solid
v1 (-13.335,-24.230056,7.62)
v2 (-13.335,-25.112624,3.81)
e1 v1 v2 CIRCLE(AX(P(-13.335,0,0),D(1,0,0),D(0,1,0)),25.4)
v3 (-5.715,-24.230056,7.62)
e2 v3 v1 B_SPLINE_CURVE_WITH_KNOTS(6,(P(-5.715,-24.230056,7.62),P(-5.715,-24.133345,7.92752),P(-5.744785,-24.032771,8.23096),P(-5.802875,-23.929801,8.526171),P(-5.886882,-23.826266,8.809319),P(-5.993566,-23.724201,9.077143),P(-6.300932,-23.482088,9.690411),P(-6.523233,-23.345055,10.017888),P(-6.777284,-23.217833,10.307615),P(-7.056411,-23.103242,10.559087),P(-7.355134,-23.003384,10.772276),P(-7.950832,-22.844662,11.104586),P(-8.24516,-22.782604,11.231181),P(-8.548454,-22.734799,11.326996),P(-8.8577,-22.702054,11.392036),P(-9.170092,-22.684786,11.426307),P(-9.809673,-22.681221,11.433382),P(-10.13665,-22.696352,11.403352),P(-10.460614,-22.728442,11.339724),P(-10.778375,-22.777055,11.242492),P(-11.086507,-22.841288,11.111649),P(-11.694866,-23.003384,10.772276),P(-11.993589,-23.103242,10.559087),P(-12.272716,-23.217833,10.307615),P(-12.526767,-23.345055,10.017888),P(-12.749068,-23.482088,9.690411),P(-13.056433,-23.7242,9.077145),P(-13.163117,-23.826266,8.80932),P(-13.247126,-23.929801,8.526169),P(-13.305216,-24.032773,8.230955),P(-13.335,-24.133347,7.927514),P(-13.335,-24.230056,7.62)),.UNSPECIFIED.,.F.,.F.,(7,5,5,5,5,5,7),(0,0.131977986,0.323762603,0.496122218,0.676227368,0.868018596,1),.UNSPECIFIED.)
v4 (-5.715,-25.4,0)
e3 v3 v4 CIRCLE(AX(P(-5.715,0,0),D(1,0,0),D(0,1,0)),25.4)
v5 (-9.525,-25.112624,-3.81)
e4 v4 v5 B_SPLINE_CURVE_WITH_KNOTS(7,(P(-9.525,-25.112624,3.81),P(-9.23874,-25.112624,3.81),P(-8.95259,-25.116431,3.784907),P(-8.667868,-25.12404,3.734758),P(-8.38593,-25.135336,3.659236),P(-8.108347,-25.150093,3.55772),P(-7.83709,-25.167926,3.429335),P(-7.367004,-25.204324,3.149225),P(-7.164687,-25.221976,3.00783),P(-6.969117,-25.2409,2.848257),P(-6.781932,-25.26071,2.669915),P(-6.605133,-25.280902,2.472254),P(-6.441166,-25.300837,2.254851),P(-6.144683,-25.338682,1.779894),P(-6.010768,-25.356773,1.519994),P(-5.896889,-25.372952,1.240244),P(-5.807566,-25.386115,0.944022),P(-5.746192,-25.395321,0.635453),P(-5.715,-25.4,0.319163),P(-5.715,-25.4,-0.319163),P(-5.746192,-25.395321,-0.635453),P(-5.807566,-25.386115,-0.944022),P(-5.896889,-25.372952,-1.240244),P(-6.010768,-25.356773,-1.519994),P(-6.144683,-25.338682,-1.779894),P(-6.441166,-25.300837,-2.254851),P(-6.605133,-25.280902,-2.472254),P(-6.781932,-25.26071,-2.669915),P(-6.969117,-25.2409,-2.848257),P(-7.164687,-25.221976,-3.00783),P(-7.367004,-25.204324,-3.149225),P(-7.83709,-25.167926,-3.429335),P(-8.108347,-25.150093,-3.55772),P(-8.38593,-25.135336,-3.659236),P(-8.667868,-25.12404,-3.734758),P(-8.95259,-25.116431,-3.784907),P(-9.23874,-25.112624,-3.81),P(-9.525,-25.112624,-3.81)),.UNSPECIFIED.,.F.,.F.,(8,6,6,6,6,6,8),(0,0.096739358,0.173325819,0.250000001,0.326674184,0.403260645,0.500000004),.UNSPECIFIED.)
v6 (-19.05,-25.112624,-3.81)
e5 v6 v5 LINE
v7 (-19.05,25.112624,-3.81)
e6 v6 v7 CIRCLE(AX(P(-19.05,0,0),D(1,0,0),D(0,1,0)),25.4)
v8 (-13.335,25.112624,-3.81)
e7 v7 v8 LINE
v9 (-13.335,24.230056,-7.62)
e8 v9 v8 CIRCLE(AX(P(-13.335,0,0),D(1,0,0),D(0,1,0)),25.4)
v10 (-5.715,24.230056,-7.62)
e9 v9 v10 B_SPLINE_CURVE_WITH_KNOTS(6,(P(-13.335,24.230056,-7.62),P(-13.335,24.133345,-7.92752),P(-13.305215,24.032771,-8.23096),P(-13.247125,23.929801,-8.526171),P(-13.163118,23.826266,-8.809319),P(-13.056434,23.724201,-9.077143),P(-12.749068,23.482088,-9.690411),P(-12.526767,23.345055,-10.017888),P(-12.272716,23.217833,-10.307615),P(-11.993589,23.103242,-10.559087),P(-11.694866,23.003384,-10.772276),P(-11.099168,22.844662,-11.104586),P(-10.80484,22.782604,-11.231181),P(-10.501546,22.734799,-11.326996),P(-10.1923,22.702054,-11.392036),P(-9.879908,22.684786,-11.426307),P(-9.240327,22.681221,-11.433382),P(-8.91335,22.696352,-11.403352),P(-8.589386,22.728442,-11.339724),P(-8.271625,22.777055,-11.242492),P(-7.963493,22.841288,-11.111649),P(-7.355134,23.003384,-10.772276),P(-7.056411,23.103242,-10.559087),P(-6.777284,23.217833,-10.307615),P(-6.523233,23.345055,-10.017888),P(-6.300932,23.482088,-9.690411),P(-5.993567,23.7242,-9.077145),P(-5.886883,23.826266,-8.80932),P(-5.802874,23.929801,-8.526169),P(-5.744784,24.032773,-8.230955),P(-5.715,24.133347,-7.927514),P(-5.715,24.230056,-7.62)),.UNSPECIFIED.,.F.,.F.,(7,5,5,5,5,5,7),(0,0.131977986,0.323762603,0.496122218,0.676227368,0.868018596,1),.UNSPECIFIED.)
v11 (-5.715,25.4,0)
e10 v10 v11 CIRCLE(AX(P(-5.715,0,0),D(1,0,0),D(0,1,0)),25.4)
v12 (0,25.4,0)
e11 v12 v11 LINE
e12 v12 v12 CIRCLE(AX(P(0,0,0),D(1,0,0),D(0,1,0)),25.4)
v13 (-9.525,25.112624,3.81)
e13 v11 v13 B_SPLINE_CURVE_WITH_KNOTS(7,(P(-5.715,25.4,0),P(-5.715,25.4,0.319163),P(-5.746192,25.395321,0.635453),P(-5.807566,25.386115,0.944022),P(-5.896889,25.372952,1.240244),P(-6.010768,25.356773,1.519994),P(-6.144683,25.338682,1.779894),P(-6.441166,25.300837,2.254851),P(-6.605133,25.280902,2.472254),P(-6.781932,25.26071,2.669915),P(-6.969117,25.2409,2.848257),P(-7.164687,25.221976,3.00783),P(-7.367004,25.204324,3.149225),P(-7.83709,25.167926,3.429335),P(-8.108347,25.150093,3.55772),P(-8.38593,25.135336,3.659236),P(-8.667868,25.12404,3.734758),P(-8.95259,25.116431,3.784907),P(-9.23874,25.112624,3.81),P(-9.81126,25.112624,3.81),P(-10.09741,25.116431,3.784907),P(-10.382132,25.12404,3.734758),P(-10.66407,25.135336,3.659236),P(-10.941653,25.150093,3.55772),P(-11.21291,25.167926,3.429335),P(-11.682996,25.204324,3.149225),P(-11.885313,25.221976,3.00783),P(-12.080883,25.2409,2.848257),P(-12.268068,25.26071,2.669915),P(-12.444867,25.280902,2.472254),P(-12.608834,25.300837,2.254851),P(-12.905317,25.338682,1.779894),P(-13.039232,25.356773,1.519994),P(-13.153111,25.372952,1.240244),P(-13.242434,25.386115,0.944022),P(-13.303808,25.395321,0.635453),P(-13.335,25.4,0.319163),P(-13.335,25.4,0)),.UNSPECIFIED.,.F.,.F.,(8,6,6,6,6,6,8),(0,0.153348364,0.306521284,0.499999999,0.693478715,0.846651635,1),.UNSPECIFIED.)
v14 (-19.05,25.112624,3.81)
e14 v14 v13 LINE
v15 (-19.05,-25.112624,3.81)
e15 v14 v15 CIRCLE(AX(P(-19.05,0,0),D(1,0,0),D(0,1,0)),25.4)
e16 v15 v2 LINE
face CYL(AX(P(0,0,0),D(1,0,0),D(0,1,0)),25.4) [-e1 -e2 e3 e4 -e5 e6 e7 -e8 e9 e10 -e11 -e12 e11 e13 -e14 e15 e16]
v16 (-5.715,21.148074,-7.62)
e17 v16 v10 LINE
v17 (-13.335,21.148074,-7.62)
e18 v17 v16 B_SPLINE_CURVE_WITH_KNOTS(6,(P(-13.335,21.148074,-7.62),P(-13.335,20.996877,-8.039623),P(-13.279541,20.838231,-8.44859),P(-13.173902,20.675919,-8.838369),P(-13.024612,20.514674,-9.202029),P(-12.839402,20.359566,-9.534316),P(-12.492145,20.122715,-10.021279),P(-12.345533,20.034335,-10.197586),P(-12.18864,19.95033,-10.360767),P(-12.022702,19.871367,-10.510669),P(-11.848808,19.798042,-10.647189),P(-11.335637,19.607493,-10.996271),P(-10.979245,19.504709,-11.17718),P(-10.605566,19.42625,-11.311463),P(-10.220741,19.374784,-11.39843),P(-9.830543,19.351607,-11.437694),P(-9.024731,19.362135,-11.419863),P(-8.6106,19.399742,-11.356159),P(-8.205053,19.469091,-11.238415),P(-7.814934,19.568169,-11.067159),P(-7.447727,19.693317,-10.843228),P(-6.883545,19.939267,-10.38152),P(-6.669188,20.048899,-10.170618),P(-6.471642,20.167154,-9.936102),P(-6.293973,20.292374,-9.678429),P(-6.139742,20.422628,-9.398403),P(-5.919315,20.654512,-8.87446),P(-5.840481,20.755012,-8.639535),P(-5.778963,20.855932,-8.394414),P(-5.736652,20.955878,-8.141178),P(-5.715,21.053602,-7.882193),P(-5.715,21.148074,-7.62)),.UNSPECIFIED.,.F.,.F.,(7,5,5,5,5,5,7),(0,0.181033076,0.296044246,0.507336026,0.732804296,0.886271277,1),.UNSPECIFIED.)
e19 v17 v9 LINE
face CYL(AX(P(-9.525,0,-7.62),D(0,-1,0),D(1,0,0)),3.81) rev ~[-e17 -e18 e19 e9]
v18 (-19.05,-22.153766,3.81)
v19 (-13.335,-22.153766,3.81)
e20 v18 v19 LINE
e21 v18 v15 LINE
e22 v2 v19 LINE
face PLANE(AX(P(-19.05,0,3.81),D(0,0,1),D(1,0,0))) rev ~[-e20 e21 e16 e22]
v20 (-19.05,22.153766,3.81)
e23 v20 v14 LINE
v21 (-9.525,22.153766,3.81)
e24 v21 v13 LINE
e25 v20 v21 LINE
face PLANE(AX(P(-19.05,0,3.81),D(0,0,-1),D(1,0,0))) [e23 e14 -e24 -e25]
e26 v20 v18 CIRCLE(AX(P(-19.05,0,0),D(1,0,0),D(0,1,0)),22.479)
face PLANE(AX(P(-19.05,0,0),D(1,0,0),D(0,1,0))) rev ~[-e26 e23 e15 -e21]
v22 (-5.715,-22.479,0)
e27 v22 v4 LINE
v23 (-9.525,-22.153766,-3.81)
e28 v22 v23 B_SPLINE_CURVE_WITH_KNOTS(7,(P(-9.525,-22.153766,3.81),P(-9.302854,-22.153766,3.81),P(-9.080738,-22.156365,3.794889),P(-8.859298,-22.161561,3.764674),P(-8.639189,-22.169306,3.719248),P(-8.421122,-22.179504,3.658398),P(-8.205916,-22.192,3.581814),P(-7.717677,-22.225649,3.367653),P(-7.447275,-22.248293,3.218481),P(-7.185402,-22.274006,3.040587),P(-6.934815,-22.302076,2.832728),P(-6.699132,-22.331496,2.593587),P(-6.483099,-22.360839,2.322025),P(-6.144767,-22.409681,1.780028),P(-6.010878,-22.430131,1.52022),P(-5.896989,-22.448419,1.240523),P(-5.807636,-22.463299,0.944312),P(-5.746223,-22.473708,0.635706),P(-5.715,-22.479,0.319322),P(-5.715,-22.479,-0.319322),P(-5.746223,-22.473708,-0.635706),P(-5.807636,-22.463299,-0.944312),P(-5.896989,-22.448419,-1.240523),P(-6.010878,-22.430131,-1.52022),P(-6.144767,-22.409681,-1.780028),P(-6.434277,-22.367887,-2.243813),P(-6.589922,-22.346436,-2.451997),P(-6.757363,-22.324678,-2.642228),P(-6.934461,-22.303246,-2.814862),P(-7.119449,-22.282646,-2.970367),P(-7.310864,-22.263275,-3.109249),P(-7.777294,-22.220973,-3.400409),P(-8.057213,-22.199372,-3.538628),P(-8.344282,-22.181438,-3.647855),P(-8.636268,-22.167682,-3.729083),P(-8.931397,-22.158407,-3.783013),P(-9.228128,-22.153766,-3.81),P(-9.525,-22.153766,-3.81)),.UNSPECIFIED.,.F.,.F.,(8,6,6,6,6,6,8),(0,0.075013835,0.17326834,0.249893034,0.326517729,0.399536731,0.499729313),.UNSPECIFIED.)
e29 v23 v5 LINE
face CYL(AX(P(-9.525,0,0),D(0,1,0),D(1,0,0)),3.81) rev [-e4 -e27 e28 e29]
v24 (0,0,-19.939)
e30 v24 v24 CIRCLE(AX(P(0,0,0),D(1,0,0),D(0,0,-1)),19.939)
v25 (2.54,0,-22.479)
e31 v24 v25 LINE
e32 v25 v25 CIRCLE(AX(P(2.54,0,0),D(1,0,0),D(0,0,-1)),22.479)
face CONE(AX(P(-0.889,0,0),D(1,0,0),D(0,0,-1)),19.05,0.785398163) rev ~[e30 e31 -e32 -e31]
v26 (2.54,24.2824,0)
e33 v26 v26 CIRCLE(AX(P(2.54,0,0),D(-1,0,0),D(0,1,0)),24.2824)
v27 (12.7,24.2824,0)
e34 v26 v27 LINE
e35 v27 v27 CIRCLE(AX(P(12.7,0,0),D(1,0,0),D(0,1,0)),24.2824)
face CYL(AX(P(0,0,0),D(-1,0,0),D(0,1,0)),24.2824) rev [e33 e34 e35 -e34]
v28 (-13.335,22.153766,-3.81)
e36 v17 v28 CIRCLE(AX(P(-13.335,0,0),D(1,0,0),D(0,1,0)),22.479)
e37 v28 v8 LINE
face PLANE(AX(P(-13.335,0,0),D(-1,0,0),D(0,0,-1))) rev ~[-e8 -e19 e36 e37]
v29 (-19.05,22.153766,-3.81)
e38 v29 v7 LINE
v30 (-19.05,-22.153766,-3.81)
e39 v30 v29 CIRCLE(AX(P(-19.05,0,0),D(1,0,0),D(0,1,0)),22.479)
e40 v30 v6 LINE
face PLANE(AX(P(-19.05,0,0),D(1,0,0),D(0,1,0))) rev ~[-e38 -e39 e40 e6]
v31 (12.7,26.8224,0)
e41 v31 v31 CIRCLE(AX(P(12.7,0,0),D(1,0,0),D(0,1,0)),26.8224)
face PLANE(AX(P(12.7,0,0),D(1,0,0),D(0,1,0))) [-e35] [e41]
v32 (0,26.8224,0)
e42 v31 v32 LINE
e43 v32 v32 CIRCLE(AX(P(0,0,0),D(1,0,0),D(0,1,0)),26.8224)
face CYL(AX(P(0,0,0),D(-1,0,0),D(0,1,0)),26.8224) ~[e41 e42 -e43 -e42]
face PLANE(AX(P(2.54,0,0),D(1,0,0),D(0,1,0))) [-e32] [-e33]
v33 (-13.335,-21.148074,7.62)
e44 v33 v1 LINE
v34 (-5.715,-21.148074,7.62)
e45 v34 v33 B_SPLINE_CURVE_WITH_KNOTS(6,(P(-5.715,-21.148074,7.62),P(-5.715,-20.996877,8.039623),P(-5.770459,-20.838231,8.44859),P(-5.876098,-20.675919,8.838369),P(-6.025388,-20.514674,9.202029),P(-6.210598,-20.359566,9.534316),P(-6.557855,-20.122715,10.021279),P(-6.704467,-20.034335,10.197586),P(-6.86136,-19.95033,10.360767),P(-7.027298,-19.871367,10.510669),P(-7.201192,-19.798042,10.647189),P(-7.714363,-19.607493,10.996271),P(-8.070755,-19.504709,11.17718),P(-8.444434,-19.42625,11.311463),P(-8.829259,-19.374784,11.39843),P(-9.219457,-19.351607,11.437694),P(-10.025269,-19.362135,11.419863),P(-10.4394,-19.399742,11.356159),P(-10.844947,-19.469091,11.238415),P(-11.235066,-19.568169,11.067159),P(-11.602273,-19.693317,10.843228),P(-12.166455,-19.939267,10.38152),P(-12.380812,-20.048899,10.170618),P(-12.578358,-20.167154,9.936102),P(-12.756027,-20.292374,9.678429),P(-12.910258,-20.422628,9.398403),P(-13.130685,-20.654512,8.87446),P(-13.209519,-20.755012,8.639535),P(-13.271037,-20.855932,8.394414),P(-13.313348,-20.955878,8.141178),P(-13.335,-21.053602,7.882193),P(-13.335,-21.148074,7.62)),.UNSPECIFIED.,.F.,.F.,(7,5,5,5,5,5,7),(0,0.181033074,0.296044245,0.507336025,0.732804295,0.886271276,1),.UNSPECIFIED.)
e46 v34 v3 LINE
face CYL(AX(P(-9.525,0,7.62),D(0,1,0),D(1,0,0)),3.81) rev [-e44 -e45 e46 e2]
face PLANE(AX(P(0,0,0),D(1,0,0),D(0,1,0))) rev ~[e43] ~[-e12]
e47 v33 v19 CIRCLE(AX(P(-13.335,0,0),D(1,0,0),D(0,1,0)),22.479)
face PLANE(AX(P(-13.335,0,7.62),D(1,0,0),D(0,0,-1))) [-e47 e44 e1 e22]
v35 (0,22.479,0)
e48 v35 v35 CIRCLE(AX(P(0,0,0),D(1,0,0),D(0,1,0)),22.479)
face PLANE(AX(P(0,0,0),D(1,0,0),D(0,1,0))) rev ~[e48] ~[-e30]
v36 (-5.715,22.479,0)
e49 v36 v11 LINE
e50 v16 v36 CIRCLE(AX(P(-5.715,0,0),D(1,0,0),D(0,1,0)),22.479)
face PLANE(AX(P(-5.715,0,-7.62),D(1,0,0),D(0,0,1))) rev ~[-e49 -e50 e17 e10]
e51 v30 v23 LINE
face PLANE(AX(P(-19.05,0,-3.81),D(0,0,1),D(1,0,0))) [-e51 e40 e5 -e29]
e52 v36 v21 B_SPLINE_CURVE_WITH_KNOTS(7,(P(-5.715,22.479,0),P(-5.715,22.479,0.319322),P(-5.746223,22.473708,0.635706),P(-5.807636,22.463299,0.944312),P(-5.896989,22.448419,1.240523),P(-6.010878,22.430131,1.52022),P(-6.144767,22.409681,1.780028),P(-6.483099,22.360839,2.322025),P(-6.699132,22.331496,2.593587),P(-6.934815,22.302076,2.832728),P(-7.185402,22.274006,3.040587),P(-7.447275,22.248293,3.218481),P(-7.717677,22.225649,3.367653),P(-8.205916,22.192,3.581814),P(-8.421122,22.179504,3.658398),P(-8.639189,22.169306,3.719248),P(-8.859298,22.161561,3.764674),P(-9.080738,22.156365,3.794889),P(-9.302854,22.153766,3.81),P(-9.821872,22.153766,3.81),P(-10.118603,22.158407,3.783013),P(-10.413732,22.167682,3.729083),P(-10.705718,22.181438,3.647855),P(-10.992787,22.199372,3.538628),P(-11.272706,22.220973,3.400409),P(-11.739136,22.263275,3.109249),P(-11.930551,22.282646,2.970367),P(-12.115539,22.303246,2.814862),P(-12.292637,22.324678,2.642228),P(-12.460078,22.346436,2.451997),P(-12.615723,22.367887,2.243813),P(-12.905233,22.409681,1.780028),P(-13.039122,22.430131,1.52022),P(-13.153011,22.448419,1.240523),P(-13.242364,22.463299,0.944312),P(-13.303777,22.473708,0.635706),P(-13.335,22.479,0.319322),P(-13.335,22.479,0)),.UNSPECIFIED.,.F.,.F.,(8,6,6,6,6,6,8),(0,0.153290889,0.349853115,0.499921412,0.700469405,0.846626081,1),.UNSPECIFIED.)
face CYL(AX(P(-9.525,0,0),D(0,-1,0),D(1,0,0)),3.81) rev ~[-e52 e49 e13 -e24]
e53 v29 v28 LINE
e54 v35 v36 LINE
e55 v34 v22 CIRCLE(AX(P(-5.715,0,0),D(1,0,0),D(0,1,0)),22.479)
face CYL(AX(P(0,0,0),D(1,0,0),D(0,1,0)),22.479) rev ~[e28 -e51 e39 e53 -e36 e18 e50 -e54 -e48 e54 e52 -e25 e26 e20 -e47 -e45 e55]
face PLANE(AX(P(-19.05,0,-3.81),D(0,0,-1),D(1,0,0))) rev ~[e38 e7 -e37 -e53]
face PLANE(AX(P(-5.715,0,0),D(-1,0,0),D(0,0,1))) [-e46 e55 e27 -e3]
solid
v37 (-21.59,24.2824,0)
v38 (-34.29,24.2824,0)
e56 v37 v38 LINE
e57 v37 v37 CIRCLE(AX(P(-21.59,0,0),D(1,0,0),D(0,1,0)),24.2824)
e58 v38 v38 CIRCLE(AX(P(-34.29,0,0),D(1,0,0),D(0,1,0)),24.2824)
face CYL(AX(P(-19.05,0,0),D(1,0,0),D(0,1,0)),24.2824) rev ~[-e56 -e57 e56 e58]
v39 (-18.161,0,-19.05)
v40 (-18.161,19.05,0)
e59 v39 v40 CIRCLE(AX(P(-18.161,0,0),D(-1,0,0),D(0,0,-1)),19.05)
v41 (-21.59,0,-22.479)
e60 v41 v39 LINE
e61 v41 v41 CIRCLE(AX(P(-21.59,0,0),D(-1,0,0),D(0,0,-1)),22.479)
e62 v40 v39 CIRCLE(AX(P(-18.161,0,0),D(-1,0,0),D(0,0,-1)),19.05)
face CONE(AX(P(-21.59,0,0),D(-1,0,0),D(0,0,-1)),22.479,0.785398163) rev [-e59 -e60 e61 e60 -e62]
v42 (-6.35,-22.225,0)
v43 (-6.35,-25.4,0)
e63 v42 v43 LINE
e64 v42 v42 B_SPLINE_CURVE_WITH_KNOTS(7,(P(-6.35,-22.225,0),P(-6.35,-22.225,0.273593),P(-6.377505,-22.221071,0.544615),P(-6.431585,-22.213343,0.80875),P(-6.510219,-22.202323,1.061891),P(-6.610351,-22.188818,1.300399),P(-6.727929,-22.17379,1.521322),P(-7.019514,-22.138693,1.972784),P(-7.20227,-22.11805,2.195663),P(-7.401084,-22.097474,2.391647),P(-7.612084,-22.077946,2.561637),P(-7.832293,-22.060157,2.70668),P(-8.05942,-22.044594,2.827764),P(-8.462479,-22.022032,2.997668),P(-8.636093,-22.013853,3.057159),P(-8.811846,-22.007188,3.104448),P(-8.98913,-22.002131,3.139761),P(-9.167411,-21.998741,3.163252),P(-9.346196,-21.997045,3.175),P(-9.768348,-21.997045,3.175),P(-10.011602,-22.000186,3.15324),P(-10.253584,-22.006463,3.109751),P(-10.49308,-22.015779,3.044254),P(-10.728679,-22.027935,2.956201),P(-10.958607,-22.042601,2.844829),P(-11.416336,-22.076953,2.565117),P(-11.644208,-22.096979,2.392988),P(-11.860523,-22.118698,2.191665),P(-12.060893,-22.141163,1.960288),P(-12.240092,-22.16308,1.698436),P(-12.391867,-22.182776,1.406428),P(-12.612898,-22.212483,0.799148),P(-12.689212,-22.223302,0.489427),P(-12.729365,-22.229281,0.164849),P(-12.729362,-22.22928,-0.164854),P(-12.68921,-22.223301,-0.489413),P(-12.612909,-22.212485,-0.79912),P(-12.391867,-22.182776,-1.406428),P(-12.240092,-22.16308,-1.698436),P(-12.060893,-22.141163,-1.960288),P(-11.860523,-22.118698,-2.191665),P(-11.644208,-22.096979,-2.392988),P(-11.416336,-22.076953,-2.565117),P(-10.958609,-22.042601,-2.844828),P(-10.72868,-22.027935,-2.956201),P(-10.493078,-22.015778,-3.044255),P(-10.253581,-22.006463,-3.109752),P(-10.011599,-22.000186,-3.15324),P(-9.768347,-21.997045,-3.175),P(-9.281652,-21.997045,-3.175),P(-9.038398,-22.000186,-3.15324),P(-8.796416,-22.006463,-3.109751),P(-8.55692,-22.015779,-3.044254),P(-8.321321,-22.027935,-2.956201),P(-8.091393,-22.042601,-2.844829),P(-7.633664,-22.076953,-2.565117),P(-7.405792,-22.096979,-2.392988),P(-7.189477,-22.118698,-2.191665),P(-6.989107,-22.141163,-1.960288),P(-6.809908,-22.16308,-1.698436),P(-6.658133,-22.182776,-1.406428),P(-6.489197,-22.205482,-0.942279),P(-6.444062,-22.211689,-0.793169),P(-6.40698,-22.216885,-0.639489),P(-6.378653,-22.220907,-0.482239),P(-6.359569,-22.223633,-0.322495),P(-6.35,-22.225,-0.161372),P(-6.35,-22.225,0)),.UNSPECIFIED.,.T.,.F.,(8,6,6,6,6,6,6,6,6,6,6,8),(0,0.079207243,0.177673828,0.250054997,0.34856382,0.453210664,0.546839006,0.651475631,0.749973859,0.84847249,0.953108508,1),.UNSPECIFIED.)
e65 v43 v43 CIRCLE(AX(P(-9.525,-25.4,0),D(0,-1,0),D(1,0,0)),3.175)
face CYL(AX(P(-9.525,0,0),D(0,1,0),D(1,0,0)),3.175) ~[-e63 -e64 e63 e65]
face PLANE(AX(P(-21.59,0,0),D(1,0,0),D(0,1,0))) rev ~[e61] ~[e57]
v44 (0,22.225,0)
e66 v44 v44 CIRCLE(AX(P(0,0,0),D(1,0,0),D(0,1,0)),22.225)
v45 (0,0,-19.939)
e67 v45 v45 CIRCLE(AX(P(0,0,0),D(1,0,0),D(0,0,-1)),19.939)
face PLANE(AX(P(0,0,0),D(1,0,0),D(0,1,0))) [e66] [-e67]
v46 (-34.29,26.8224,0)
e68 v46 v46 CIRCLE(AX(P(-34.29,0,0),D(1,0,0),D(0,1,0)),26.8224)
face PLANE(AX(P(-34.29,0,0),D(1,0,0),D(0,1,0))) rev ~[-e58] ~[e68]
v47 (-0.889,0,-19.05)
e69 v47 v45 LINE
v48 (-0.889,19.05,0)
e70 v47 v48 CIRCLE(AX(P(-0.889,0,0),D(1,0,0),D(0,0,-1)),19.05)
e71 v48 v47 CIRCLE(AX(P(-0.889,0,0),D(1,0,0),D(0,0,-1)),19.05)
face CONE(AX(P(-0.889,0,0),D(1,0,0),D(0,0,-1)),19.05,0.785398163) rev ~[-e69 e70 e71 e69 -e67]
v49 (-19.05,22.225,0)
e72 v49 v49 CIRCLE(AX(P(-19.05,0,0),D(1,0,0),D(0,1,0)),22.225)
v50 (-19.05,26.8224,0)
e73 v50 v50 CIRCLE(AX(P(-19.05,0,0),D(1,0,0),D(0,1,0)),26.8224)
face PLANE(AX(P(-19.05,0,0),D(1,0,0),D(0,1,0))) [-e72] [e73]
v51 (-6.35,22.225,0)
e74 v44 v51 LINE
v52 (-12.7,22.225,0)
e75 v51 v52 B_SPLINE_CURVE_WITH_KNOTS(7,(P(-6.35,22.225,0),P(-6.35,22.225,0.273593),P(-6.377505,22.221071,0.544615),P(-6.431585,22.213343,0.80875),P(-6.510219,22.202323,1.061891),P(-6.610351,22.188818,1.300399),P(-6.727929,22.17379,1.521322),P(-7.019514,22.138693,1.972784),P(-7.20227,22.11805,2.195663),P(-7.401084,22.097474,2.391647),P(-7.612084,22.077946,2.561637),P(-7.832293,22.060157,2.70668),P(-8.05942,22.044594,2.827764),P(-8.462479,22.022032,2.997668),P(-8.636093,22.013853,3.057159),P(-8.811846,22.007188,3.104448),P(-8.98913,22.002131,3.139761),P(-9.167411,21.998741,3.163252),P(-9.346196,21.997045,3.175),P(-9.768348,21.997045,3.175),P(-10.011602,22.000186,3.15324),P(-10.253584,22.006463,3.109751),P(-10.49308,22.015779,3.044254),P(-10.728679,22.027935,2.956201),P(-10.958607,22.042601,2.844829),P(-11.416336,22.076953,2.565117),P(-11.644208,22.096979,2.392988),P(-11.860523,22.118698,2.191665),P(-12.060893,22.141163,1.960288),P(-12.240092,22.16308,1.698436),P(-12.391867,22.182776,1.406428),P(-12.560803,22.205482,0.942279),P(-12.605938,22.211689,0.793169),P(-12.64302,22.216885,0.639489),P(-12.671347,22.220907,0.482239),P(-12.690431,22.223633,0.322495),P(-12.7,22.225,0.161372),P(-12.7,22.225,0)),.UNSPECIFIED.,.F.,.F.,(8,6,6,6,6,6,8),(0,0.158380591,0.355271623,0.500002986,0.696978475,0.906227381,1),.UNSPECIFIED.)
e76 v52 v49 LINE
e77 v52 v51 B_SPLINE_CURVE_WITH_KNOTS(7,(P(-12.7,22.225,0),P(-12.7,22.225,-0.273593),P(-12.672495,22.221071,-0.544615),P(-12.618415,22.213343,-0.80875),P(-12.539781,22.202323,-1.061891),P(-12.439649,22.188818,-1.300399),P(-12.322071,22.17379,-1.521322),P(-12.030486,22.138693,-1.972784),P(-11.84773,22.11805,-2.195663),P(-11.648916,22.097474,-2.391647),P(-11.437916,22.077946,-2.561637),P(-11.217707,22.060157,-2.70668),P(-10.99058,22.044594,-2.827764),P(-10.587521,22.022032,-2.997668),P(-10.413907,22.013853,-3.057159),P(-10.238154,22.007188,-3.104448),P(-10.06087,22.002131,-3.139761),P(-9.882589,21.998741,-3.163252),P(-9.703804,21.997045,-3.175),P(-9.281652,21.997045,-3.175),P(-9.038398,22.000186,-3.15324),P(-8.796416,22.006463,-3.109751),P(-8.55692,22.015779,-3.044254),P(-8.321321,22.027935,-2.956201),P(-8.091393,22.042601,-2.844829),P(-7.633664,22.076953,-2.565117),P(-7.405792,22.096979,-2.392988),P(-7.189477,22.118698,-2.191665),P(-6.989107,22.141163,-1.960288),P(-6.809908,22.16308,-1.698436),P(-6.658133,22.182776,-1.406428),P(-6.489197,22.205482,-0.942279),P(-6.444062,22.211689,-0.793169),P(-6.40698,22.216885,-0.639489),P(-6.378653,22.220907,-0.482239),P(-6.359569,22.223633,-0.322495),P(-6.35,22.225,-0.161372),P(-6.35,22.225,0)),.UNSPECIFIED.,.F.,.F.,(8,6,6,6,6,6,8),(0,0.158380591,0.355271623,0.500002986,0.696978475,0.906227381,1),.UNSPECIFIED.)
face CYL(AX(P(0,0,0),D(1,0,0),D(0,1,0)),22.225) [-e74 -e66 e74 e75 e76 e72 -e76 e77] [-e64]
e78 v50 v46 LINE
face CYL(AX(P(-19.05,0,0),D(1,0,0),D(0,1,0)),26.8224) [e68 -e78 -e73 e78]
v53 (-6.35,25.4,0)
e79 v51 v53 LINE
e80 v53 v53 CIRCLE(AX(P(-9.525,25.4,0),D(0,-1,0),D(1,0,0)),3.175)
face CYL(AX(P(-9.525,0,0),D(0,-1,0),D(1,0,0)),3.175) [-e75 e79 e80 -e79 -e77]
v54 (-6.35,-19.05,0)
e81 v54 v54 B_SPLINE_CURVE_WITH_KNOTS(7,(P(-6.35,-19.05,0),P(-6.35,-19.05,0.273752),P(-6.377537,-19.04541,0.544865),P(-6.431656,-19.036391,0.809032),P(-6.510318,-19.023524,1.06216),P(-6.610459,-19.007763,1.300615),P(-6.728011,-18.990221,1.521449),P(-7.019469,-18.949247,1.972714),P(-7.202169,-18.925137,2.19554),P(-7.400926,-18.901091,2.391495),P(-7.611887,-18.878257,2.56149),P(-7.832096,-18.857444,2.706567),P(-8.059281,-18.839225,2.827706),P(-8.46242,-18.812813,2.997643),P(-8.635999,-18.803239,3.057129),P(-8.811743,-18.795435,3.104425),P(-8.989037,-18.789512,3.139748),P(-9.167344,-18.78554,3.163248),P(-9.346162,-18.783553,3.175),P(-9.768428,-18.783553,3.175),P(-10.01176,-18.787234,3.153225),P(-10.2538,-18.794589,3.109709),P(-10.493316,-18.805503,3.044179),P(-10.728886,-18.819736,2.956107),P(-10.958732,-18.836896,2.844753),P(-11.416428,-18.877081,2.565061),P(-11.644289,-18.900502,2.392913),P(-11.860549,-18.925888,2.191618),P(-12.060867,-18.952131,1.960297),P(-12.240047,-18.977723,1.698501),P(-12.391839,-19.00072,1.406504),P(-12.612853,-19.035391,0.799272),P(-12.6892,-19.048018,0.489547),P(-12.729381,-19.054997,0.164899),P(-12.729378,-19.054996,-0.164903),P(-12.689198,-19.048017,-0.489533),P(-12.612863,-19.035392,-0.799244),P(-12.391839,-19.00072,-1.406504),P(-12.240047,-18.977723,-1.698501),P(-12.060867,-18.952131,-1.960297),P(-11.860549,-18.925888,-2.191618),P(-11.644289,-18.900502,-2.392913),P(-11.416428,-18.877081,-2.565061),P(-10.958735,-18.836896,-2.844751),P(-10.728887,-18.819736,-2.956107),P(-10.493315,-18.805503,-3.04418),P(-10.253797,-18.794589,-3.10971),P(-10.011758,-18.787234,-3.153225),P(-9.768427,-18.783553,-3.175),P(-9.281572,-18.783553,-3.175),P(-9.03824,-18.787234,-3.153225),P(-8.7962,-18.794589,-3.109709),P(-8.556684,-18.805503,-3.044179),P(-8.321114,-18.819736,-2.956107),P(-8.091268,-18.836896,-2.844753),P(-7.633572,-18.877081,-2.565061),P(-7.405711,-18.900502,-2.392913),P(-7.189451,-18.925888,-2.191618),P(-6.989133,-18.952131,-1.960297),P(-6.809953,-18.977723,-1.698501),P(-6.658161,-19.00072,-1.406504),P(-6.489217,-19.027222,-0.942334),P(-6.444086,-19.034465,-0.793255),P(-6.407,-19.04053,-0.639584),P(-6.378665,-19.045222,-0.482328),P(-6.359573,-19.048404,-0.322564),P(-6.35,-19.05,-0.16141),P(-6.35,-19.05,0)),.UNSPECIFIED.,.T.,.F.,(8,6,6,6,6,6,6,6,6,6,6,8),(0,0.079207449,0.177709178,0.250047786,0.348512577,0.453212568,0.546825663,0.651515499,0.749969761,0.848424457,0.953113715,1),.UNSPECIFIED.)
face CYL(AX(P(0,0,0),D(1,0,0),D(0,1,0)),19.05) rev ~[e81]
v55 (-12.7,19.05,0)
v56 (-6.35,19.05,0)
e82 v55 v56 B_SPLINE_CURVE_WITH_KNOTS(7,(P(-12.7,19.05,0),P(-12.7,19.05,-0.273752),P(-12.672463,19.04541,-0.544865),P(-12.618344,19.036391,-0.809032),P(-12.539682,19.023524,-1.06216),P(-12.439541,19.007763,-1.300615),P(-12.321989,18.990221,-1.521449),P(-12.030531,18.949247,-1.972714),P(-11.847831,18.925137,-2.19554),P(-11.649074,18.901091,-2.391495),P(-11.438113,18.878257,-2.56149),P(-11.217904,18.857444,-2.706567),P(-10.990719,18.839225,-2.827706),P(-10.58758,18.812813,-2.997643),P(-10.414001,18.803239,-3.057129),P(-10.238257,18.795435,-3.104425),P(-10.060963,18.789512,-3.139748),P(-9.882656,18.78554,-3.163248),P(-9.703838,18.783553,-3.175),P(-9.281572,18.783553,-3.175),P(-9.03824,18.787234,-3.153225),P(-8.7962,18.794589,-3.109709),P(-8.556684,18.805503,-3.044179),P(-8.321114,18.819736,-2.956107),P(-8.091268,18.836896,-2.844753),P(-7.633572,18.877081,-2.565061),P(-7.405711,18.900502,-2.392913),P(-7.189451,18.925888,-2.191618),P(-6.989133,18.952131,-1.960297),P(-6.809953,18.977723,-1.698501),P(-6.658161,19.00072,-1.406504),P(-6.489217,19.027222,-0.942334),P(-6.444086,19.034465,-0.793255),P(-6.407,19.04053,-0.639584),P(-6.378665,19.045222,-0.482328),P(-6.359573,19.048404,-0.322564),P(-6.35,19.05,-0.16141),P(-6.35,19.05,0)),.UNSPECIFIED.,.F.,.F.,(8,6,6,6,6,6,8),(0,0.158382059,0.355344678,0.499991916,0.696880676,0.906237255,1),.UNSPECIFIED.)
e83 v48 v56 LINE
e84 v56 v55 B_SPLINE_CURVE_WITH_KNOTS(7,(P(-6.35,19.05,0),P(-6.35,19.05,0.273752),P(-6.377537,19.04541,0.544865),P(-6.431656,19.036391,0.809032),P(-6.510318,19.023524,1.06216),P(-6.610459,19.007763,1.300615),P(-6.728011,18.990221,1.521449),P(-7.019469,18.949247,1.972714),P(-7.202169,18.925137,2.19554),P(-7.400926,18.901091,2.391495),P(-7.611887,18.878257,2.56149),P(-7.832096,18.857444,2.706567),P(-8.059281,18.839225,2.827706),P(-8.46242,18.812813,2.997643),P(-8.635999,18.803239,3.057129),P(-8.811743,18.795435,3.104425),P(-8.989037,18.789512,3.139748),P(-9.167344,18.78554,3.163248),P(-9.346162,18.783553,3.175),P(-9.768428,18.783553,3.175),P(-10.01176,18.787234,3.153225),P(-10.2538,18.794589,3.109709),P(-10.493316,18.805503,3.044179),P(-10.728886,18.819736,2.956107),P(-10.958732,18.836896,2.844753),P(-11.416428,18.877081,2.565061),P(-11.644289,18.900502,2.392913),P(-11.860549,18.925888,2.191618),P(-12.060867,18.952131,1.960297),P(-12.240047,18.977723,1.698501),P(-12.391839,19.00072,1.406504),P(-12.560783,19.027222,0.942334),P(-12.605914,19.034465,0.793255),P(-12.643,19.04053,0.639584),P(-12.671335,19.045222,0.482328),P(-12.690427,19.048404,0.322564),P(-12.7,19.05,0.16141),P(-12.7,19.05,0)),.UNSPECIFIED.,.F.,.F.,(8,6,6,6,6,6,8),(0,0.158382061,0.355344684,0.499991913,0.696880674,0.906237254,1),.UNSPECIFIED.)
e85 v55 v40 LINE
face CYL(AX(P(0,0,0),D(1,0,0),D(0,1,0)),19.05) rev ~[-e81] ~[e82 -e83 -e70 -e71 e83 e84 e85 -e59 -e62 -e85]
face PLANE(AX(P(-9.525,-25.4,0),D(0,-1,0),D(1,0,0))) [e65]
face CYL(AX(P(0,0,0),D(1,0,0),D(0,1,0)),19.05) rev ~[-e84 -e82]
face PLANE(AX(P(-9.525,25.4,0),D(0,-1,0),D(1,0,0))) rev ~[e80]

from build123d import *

# Parameters (mm, degrees)
F0_R           = 26.8224
F0_R_2         = 24.2824
F0_R_3         = 19.05
F1_DEPTH       = 2.54
F2_DEPTH       = 12.7
F3_R           = 25.4
F3_R_2         = 22.479
F4_DEPTH       = 19.05
F5_W           = 9.525
F5_H           = 7.62
F6_DEPTH       = 50.8
F6_DEPTH_BACK  = 50.8
F7_R           = 3.81
F8_DEPTH       = 50.8
F8_DEPTH_BACK  = 50.8
F10_DEPTH      = 50.8
F12_DEPTH      = 25.4
F13_R          = 22.225
F13_R_2        = 19.05
F14_DEPTH      = 21.59
F15_START      = -19.05
F13_R_3        = 24.2824
F15_DEPTH      = 2.54
F17_START      = -19.05
F16_R          = 26.8224
F16_R_2        = 24.2824
F17_DEPTH      = 15.24
F18_R          = 3.175
F19_DEPTH      = 25.4
F19_DEPTH_BACK = 25.4
F20_DEPTH      = 25.4
F21_W          = 2.54
F21_H          = 0.889


with BuildPart() as f1:
    # F0 (on Right) → F1 (new body)
    with BuildSketch(Plane.YZ):
        Circle(F0_R)
        Circle(F0_R_2, mode=Mode.SUBTRACT)
        Circle(F0_R_2)
        Circle(F0_R_3, mode=Mode.SUBTRACT)
    extrude(amount=F1_DEPTH)

    # F0 (on Right) → F2 (join)
    with BuildSketch(Plane.YZ):
        Circle(F0_R)
        Circle(F0_R_2, mode=Mode.SUBTRACT)
    extrude(amount=F2_DEPTH)

    # F3 (on Right) → F4 (join)
    with BuildSketch(Plane.YZ):
        Circle(F3_R)
        Circle(F3_R_2, mode=Mode.SUBTRACT)
    extrude(amount=-F4_DEPTH)

    # F5 (on Front) → F6 (cut, two sides)
    with BuildSketch(Plane.XZ) as f6_sk:
        with Locations((-14.2875, 0)):
            Rectangle(F5_W, F5_H)
    extrude(amount=-F6_DEPTH, mode=Mode.SUBTRACT)
    extrude(f6_sk.sketch, amount=F6_DEPTH_BACK, mode=Mode.SUBTRACT)

    # F7 (on Front) → F8 (cut, two sides)
    with BuildSketch(Plane.XZ) as f8_sk:
        with Locations((-9.525, 0)):
            Circle(F7_R)
    extrude(amount=-F8_DEPTH, mode=Mode.SUBTRACT)
    extrude(f8_sk.sketch, amount=F8_DEPTH_BACK, mode=Mode.SUBTRACT)

    # F9 (on Front) → F10 (cut)
    with BuildSketch(Plane.XZ):
        with BuildLine():
            ThreePointArc((-13.335, 7.62), (-9.525, 3.81), (-5.715, 7.62))
            ThreePointArc((-5.715, 7.62), (-9.525, 11.43), (-13.335, 7.62))
        make_face()
        with BuildLine():
            Line((-5.715, 0), (-5.715, 7.62))
            ThreePointArc((-5.715, 7.62), (-9.525, 3.81), (-13.335, 7.62))
            Line((-13.335, 7.62), (-13.335, 0))
            Line((-13.335, 0), (-5.715, 0))
        make_face()
    extrude(amount=F10_DEPTH, mode=Mode.SUBTRACT)

    # F11 (on Front) → F12 (cut)
    with BuildSketch(Plane.XZ):
        with BuildLine():
            ThreePointArc((-13.335, -7.62), (-9.525, -3.81), (-5.715, -7.62))
            Line((-5.715, -7.62), (-5.715, 0))
            Line((-5.715, 0), (-13.335, 0))
            Line((-13.335, 0), (-13.335, -7.62))
        make_face()
        with BuildLine():
            ThreePointArc((-13.335, -7.62), (-9.525, -11.43), (-5.715, -7.62))
            ThreePointArc((-5.715, -7.62), (-9.525, -3.81), (-13.335, -7.62))
        make_face()
    extrude(amount=-F12_DEPTH, mode=Mode.SUBTRACT)


with BuildPart() as f14:
    # F13 (on Right) → F14 (new body)
    with BuildSketch(Plane.YZ):
        Circle(F13_R)
        Circle(F13_R_2, mode=Mode.SUBTRACT)
    extrude(amount=-F14_DEPTH)

    # F13 (on Right) → F15 (join)
    with BuildSketch(Plane.YZ.offset(F15_START)):
        Circle(F13_R_3)
        Circle(F13_R, mode=Mode.SUBTRACT)
    extrude(amount=-F15_DEPTH)

    # F16 (on Right) → F17 (join)
    with BuildSketch(Plane.YZ.offset(F17_START)):
        Circle(F16_R)
        Circle(F16_R_2, mode=Mode.SUBTRACT)
    extrude(amount=-F17_DEPTH)

    # F18 (on Front) → F19 (join, two sides)
    with BuildSketch(Plane.XZ) as f19_sk:
        with Locations((-9.525, 0)):
            Circle(F18_R)
    extrude(amount=F19_DEPTH)
    extrude(f19_sk.sketch, amount=-F19_DEPTH_BACK)

    # F13 (on Right) → F20 (cut)
    with BuildSketch(Plane.YZ):
        Circle(F13_R_2)
    extrude(amount=-F20_DEPTH, mode=Mode.SUBTRACT)


with BuildPart() as f22_tool:
    # F21 (on Front) → F22 (revolve)
    with BuildSketch(Plane.XZ):
        Polygon((0, -19.939), (2.54, -22.479), (2.54, -19.939), align=None)
        with Locations((1.27, -19.4945)):
            Rectangle(F21_W, F21_H)
        Polygon((-0.889, -19.05), (0, -19.939), (0, -19.05), align=None)
    revolve(axis=Axis((12.2344479781, 0, 0), (1, 0, 0)))


with BuildPart() as f1_1:
    add(f1.part)

    # F22: cut by f22_tool
    add(f22_tool.part, mode=Mode.SUBTRACT)

    # F21 (on Front) → F25 (revolve, cut)
    with BuildSketch(Plane.XZ):
        Polygon((0, -19.939), (2.54, -22.479), (2.54, -19.939), align=None)
        with Locations((1.27, -19.4945)):
            Rectangle(F21_W, F21_H)
        Polygon((-0.889, -19.05), (0, -19.939), (0, -19.05), align=None)
    revolve(axis=Axis((12.2344479781, 0, 0), (1, 0, 0)), mode=Mode.SUBTRACT)


with BuildPart() as f14_1:
    add(f14.part)

    # F22: cut by f22_tool
    add(f22_tool.part, mode=Mode.SUBTRACT)

    # F23 (on Front) → F24 (revolve, cut)
    with BuildSketch(Plane.XZ):
        Polygon((-18.161, -19.05), (-21.59, -19.05), (-21.59, -22.479), align=None)
    revolve(axis=Axis((-10.795, 0, 0), (-1, 0, 0)), mode=Mode.SUBTRACT)


solid = Compound([f1_1.part, f14_1.part])
